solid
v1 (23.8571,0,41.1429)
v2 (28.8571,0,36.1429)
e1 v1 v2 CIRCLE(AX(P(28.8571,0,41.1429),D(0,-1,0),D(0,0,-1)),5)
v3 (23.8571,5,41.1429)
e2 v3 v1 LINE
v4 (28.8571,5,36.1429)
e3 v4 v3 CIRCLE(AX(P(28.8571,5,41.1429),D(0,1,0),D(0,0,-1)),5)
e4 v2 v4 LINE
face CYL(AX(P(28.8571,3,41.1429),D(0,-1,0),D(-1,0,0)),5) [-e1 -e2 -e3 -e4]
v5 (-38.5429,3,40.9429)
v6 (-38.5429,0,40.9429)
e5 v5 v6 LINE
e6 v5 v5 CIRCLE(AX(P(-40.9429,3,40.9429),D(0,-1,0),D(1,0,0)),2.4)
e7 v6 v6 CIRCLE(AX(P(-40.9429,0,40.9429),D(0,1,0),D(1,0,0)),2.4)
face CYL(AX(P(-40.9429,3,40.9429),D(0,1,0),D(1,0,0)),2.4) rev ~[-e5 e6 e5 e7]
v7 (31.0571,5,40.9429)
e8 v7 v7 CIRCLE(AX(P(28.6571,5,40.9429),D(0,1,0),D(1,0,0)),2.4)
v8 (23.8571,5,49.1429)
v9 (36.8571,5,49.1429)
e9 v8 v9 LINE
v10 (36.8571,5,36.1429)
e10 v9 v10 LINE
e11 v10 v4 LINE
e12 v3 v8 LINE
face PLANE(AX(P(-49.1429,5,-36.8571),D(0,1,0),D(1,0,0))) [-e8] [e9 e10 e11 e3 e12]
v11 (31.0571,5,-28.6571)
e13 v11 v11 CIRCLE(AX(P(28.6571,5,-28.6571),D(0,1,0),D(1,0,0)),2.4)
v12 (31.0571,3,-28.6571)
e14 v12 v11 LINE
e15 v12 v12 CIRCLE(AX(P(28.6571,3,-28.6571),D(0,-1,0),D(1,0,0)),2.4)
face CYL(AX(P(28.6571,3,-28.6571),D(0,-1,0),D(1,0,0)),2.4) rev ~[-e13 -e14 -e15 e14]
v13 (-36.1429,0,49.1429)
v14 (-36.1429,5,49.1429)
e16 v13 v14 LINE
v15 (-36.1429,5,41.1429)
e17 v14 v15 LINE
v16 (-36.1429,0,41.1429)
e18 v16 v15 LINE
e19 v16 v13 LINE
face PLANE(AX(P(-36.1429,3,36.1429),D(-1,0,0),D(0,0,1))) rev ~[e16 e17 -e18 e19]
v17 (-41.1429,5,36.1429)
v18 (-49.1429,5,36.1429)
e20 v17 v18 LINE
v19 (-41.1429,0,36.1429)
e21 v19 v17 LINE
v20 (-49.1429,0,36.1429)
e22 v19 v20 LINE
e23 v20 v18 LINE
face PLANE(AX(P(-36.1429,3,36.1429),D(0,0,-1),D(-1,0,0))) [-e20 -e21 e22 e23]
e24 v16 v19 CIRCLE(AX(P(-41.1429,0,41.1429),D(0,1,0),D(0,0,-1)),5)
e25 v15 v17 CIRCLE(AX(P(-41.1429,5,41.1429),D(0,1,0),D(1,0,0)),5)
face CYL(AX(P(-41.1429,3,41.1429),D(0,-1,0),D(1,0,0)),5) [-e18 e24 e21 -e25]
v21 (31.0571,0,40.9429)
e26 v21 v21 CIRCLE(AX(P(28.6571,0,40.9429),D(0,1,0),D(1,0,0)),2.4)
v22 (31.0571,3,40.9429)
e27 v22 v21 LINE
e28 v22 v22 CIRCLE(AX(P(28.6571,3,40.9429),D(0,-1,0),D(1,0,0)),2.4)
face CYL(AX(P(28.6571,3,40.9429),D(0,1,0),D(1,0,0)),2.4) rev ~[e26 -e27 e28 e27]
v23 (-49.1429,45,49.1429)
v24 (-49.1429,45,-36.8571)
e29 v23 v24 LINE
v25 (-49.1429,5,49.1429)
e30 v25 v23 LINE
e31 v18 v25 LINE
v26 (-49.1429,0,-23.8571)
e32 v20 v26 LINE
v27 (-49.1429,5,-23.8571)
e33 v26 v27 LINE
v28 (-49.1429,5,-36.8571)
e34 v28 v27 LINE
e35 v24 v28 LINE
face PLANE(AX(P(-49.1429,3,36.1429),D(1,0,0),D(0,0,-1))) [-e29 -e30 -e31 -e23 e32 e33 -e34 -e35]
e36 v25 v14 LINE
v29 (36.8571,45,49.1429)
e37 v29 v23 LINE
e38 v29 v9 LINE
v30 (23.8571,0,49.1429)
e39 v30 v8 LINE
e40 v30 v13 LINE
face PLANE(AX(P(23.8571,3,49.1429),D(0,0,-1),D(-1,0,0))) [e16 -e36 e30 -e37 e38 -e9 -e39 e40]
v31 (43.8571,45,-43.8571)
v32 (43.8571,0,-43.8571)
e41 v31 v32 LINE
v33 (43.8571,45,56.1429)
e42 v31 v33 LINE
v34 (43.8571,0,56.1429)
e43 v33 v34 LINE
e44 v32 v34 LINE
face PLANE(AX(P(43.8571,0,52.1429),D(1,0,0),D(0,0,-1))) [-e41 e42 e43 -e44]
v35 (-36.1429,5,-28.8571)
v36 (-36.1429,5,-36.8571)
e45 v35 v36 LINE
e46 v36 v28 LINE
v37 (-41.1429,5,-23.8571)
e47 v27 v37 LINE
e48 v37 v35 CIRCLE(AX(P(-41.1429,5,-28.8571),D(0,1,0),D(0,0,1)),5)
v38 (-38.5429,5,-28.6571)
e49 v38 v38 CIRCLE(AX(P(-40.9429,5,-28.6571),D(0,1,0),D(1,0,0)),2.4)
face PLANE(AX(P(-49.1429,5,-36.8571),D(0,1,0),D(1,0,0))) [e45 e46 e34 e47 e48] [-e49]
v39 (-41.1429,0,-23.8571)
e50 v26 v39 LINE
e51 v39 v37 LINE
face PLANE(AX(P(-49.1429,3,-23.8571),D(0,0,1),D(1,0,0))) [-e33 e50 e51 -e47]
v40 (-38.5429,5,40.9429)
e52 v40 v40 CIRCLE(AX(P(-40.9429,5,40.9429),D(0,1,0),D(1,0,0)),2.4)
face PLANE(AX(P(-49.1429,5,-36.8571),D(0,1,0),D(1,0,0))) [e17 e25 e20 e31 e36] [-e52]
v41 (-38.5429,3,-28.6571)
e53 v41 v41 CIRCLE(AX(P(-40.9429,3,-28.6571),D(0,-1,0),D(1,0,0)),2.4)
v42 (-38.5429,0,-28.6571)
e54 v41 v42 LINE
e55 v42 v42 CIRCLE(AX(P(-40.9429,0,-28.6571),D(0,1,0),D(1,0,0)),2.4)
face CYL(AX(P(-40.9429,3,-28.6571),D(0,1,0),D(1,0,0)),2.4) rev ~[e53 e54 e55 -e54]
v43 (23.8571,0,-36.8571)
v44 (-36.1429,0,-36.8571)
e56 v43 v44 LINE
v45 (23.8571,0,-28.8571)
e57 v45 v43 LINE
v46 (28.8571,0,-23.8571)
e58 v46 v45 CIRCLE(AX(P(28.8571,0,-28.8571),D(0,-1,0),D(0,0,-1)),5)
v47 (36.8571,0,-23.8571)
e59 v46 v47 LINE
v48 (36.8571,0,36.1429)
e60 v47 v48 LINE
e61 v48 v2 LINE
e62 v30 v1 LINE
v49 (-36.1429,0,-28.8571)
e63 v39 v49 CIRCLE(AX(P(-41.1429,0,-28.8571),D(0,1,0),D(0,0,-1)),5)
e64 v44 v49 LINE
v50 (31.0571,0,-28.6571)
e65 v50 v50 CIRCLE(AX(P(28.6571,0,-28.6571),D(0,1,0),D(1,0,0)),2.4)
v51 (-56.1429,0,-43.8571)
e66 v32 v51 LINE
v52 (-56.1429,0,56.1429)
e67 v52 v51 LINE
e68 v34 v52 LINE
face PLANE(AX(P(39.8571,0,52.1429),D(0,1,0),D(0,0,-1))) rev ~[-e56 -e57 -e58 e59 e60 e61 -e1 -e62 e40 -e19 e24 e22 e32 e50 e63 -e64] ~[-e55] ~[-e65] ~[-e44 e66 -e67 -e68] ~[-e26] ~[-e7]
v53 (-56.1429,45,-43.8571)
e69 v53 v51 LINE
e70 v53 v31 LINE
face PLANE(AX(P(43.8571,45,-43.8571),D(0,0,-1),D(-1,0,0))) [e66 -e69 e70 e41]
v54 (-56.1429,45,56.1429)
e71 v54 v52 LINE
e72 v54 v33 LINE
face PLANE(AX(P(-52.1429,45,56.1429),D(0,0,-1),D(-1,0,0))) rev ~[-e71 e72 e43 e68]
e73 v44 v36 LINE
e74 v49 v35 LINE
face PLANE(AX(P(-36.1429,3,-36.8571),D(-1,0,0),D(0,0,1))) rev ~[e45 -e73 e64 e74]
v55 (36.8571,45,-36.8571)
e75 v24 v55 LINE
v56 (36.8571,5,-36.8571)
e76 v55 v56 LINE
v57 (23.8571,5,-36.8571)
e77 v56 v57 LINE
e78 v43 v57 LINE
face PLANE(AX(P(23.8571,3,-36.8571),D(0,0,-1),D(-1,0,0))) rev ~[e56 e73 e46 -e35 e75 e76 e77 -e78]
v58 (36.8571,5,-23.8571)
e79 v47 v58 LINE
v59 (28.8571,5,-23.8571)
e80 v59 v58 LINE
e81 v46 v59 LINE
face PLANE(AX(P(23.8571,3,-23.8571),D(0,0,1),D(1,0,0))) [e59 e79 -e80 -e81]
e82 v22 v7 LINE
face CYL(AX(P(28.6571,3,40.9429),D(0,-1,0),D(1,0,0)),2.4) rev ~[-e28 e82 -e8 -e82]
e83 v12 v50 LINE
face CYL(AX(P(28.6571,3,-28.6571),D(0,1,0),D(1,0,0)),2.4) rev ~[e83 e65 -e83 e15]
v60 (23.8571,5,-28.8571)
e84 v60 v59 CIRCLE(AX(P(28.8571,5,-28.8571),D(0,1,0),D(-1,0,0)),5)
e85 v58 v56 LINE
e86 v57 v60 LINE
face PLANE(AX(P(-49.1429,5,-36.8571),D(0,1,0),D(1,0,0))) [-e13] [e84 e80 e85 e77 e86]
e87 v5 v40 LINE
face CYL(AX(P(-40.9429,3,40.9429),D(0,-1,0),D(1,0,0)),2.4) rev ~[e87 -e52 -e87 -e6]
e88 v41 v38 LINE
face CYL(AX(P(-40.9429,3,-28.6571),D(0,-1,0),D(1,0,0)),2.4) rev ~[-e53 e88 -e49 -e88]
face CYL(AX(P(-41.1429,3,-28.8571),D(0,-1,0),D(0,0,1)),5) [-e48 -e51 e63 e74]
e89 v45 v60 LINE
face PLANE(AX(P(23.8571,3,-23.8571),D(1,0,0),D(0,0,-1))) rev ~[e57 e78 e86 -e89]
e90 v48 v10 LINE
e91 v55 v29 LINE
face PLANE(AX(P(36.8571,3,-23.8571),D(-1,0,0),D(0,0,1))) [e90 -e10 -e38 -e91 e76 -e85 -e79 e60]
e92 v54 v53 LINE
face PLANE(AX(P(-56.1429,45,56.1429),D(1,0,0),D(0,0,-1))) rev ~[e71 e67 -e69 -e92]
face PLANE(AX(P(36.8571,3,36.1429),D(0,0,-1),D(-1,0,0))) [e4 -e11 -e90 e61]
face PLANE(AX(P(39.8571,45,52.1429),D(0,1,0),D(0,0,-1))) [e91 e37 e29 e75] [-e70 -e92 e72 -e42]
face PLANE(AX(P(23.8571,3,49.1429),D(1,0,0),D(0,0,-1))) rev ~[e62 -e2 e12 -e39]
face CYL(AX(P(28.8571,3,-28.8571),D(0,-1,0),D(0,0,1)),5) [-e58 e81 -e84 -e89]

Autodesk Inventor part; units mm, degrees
ref_plane "YZ Plane" through (0, 0, 0) normal (1, 0, 0) x (0, 1, 0)
ref_plane "XZ Plane" through (0, 0, 0) normal (0, 1, 0) x (-1, 0, 0)
ref_plane "XY Plane" through (0, 0, 0) normal (0, 0, 1) x (1, 0, 0)
sketch "Sketch1" plane through (0, 0, 0) normal (0, 1, 0) x (-1, 0, 0)
  line L0 (49.1429, 49.1429) -> (-36.8571, 49.1429)
  line L1 (-36.8571, 49.1429) -> (-36.8571, -36.8571)
  line L2 (-36.8571, -36.8571) -> (49.1429, -36.8571)
  line L3 (49.1429, -36.8571) -> (49.1429, 49.1429)
  line L4 (52.1429, 52.1429) -> (-39.8571, 52.1429)
  line L5 (-39.8571, 52.1429) -> (-39.8571, -39.8571)
  line L6 (-39.8571, -39.8571) -> (52.1429, -39.8571)
  line L7 (52.1429, -39.8571) -> (52.1429, 52.1429)
  point P0 (0, 0)
  dimension "d0" = 86
  dimension "d1" = 86
  dimension "d2" = 92
extrude "Extrusion1" add sketch "Sketch1" along normal blind 45 contours L3 L2 L1 L0 | L7 L6 L5 L4
shell "Shell1" thickness 3 removed faces 1 at (9.1905, 45, -9.1905)
sketch "Sketch3" plane through (-49.1429, 3, -36.8571) normal (0, 1, 0) x (1, 0, 0)
  line L0 (86, -86) -> (0, -86) projected
  line L1 (86, 0) -> (0, 0) projected
  line L2 (13, -86) -> (73, -86)
  line L3 (73, -86) -> (73, 0)
  line L4 (73, 0) -> (13, 0)
  line L5 (13, 0) -> (13, -86)
  line L6 (86, 0) -> (86, -86) projected
  line L7 (86, -73) -> (0, -73)
  line L8 (0, -73) -> (0, -13)
  line L9 (0, -13) -> (86, -13)
  line L10 (86, -13) -> (86, -73)
  line L11 (0, -86) -> (0, 0) projected
  point P0 (49.1429, -36.8571)
  point P1 (73, -73)
  point P2 (73, -13)
  point P3 (13, 0)
  point P4 (13, -13)
  point P5 (13, -73)
  point P6 (73, -86)
  dimension "d6" = 13
  dimension "d7" = 13
  dimension "d8" = 13
  dimension "d9" = 13
extrude "Extrusion2" cut sketch "Sketch3" against normal blind 40 contours L0 L5 L7 L3 | L7 L3 L9 L6 | L7 L5 L9 L3 | L7 L8 L9 L5 | L9 L5 L1 L3
sketch "Sketch4" plane through (-49.1429, 3, 36.1429) normal (0, 1, 0) x (1, 0, 0)
  line L0 (86, -13) -> (0, -13) projected
  line L1 (0, -13) -> (0, 73) projected
  line L2 (0, 73) -> (86, 73) projected
  line L3 (86, 73) -> (86, -13) projected
  line L4 (89, -16) -> (89, 76) projected
  line L5 (89, 76) -> (-3, 76) projected
  line L6 (-3, 76) -> (-3, -16) projected
  line L7 (-3, -16) -> (89, -16) projected
  line L8 (8.2, 64.8) -> (8.2, -4.8)
  line L9 (8.2, -4.8) -> (77.8, -4.8)
  line L10 (77.8, -4.8) -> (77.8, 64.8)
  line L11 (77.8, 64.8) -> (8.2, 64.8)
  circle A0 centre (8.2, -4.8) radius 2.4
  circle A1 centre (8.2, 64.8) radius 2.4
  circle A2 centre (77.8, -4.8) radius 2.4
  circle A3 centre (77.8, 64.8) radius 2.4
  point P0 (49.1429, 36.1429)
  dimension "d12" = 69.6
  dimension "d13" = 4.8
  dimension "d14" = 4.8
  dimension "d15" = 4.8
  dimension "d16" = 4.8
extrude "Extrusion3" cut sketch "Sketch4" against normal blind 25 contours L11 A1 L8 | L8 A1 L11 | A0 L9 L8 | L8 L9 A0 | A3 L10 L11 | L11 L10 A3 | A2 L10 L9 | L9 L10 A2
fillet "Fillet1" radius 5 4 edges at (-36.1429, 1.5, 36.1429) (-36.1429, 1.5, -23.8571) (23.8571, 1.5, 36.1429) (23.8571, 1.5, -23.8571)
sketch "Sketch5" plane through (39.8571, 0, 52.1429) normal (1, 0, 0) x (0, 0, -1)
  line L0 (0, 0) -> (92, 0) projected
  line L1 (92, 0) -> (92, 45) projected
  line L2 (0, 45) -> (92, 45) projected
  line L3 (0, 0) -> (0, 45) projected
  point P0 (52.1429, 0)
extrude "Extrusion4" add sketch "Sketch5" along normal blind 4
sketch "Sketch6" plane through (0, 45, 0) normal (0, 1, 0) x (1, 0, 0)
  line L0 (-52.1429, 39.8571) -> (-52.1429, -52.1429) projected
  line L1 (-52.1429, -52.1429) -> (43.8571, -52.1429)
  line L2 (43.8571, -52.1429) -> (43.8571, -56.1429)
  line L3 (43.8571, -56.1429) -> (-52.1429, -56.1429)
  line L4 (-52.1429, -56.1429) -> (-52.1429, -52.1429)
  line L5 (-52.1429, 39.8571) -> (43.8571, 39.8571)
  line L6 (43.8571, 39.8571) -> (43.8571, 43.8571)
  line L7 (43.8571, 43.8571) -> (-52.1429, 43.8571)
  line L8 (-52.1429, 43.8571) -> (-52.1429, 39.8571)
  line L9 (43.8571, 39.8571) -> (43.8571, -52.1429) projected
  line L10 (-52.1429, -56.1429) -> (-56.1429, -56.1429)
  line L11 (-56.1429, -56.1429) -> (-56.1429, 43.8571)
  line L12 (-56.1429, 43.8571) -> (-52.1429, 43.8571)
  line L13 (-52.1429, 43.8571) -> (-52.1429, -56.1429)
  point P0 (0, 0)
  dimension "d22" = 4
  dimension "d23" = 4
  dimension "d26" = 4
extrude "Extrusion5" add sketch "Sketch6" against normal up to surface (45 mm away) contours L8 L7 L6 L5 | L0 L4 L10 L11 L12 L8 | L1 L2 L3 L4
sketch "Sketch7" plane through (-49.1429, 3, -36.8571) normal (0, 1, 0) x (1, 0, 0)
  arc A0 (8, -13) -> (13, -8) centre (8, -8) ccw projected
  line L0 (13, -8) -> (13, 0) projected
  line L1 (13, 0) -> (0, 0) projected
  line L2 (0, 0) -> (0, -13) projected
  line L3 (0, -13) -> (8, -13) projected
  circle A1 centre (8.2, -8.2) radius 2.4 projected
  arc A2 (13, -78) -> (8, -73) centre (8, -78) ccw projected
  line L4 (8, -73) -> (0, -73) projected
  line L5 (0, -73) -> (0, -86) projected
  line L6 (0, -86) -> (13, -86) projected
  line L7 (13, -86) -> (13, -78) projected
  circle A3 centre (8.2, -77.8) radius 2.4 projected
  arc A4 (78, -73) -> (73, -78) centre (78, -78) ccw projected
  line L8 (73, -78) -> (73, -86) projected
  line L9 (73, -86) -> (86, -86) projected
  line L10 (86, -86) -> (86, -73) projected
  line L11 (86, -73) -> (78, -73) projected
  circle A5 centre (77.8, -77.8) radius 2.4 projected
  arc A6 (73, -8) -> (78, -13) centre (78, -8) ccw projected
  line L12 (78, -13) -> (86, -13) projected
  line L13 (86, -13) -> (86, 0) projected
  line L14 (86, 0) -> (73, 0) projected
  line L15 (73, 0) -> (73, -8) projected
  circle A7 centre (77.8, -8.2) radius 2.4 projected
  point P0 (49.1429, -36.8571)
extrude "Extrusion6" add sketch "Sketch7" along normal blind 2
properties part number "BigMotorDerzavka"
